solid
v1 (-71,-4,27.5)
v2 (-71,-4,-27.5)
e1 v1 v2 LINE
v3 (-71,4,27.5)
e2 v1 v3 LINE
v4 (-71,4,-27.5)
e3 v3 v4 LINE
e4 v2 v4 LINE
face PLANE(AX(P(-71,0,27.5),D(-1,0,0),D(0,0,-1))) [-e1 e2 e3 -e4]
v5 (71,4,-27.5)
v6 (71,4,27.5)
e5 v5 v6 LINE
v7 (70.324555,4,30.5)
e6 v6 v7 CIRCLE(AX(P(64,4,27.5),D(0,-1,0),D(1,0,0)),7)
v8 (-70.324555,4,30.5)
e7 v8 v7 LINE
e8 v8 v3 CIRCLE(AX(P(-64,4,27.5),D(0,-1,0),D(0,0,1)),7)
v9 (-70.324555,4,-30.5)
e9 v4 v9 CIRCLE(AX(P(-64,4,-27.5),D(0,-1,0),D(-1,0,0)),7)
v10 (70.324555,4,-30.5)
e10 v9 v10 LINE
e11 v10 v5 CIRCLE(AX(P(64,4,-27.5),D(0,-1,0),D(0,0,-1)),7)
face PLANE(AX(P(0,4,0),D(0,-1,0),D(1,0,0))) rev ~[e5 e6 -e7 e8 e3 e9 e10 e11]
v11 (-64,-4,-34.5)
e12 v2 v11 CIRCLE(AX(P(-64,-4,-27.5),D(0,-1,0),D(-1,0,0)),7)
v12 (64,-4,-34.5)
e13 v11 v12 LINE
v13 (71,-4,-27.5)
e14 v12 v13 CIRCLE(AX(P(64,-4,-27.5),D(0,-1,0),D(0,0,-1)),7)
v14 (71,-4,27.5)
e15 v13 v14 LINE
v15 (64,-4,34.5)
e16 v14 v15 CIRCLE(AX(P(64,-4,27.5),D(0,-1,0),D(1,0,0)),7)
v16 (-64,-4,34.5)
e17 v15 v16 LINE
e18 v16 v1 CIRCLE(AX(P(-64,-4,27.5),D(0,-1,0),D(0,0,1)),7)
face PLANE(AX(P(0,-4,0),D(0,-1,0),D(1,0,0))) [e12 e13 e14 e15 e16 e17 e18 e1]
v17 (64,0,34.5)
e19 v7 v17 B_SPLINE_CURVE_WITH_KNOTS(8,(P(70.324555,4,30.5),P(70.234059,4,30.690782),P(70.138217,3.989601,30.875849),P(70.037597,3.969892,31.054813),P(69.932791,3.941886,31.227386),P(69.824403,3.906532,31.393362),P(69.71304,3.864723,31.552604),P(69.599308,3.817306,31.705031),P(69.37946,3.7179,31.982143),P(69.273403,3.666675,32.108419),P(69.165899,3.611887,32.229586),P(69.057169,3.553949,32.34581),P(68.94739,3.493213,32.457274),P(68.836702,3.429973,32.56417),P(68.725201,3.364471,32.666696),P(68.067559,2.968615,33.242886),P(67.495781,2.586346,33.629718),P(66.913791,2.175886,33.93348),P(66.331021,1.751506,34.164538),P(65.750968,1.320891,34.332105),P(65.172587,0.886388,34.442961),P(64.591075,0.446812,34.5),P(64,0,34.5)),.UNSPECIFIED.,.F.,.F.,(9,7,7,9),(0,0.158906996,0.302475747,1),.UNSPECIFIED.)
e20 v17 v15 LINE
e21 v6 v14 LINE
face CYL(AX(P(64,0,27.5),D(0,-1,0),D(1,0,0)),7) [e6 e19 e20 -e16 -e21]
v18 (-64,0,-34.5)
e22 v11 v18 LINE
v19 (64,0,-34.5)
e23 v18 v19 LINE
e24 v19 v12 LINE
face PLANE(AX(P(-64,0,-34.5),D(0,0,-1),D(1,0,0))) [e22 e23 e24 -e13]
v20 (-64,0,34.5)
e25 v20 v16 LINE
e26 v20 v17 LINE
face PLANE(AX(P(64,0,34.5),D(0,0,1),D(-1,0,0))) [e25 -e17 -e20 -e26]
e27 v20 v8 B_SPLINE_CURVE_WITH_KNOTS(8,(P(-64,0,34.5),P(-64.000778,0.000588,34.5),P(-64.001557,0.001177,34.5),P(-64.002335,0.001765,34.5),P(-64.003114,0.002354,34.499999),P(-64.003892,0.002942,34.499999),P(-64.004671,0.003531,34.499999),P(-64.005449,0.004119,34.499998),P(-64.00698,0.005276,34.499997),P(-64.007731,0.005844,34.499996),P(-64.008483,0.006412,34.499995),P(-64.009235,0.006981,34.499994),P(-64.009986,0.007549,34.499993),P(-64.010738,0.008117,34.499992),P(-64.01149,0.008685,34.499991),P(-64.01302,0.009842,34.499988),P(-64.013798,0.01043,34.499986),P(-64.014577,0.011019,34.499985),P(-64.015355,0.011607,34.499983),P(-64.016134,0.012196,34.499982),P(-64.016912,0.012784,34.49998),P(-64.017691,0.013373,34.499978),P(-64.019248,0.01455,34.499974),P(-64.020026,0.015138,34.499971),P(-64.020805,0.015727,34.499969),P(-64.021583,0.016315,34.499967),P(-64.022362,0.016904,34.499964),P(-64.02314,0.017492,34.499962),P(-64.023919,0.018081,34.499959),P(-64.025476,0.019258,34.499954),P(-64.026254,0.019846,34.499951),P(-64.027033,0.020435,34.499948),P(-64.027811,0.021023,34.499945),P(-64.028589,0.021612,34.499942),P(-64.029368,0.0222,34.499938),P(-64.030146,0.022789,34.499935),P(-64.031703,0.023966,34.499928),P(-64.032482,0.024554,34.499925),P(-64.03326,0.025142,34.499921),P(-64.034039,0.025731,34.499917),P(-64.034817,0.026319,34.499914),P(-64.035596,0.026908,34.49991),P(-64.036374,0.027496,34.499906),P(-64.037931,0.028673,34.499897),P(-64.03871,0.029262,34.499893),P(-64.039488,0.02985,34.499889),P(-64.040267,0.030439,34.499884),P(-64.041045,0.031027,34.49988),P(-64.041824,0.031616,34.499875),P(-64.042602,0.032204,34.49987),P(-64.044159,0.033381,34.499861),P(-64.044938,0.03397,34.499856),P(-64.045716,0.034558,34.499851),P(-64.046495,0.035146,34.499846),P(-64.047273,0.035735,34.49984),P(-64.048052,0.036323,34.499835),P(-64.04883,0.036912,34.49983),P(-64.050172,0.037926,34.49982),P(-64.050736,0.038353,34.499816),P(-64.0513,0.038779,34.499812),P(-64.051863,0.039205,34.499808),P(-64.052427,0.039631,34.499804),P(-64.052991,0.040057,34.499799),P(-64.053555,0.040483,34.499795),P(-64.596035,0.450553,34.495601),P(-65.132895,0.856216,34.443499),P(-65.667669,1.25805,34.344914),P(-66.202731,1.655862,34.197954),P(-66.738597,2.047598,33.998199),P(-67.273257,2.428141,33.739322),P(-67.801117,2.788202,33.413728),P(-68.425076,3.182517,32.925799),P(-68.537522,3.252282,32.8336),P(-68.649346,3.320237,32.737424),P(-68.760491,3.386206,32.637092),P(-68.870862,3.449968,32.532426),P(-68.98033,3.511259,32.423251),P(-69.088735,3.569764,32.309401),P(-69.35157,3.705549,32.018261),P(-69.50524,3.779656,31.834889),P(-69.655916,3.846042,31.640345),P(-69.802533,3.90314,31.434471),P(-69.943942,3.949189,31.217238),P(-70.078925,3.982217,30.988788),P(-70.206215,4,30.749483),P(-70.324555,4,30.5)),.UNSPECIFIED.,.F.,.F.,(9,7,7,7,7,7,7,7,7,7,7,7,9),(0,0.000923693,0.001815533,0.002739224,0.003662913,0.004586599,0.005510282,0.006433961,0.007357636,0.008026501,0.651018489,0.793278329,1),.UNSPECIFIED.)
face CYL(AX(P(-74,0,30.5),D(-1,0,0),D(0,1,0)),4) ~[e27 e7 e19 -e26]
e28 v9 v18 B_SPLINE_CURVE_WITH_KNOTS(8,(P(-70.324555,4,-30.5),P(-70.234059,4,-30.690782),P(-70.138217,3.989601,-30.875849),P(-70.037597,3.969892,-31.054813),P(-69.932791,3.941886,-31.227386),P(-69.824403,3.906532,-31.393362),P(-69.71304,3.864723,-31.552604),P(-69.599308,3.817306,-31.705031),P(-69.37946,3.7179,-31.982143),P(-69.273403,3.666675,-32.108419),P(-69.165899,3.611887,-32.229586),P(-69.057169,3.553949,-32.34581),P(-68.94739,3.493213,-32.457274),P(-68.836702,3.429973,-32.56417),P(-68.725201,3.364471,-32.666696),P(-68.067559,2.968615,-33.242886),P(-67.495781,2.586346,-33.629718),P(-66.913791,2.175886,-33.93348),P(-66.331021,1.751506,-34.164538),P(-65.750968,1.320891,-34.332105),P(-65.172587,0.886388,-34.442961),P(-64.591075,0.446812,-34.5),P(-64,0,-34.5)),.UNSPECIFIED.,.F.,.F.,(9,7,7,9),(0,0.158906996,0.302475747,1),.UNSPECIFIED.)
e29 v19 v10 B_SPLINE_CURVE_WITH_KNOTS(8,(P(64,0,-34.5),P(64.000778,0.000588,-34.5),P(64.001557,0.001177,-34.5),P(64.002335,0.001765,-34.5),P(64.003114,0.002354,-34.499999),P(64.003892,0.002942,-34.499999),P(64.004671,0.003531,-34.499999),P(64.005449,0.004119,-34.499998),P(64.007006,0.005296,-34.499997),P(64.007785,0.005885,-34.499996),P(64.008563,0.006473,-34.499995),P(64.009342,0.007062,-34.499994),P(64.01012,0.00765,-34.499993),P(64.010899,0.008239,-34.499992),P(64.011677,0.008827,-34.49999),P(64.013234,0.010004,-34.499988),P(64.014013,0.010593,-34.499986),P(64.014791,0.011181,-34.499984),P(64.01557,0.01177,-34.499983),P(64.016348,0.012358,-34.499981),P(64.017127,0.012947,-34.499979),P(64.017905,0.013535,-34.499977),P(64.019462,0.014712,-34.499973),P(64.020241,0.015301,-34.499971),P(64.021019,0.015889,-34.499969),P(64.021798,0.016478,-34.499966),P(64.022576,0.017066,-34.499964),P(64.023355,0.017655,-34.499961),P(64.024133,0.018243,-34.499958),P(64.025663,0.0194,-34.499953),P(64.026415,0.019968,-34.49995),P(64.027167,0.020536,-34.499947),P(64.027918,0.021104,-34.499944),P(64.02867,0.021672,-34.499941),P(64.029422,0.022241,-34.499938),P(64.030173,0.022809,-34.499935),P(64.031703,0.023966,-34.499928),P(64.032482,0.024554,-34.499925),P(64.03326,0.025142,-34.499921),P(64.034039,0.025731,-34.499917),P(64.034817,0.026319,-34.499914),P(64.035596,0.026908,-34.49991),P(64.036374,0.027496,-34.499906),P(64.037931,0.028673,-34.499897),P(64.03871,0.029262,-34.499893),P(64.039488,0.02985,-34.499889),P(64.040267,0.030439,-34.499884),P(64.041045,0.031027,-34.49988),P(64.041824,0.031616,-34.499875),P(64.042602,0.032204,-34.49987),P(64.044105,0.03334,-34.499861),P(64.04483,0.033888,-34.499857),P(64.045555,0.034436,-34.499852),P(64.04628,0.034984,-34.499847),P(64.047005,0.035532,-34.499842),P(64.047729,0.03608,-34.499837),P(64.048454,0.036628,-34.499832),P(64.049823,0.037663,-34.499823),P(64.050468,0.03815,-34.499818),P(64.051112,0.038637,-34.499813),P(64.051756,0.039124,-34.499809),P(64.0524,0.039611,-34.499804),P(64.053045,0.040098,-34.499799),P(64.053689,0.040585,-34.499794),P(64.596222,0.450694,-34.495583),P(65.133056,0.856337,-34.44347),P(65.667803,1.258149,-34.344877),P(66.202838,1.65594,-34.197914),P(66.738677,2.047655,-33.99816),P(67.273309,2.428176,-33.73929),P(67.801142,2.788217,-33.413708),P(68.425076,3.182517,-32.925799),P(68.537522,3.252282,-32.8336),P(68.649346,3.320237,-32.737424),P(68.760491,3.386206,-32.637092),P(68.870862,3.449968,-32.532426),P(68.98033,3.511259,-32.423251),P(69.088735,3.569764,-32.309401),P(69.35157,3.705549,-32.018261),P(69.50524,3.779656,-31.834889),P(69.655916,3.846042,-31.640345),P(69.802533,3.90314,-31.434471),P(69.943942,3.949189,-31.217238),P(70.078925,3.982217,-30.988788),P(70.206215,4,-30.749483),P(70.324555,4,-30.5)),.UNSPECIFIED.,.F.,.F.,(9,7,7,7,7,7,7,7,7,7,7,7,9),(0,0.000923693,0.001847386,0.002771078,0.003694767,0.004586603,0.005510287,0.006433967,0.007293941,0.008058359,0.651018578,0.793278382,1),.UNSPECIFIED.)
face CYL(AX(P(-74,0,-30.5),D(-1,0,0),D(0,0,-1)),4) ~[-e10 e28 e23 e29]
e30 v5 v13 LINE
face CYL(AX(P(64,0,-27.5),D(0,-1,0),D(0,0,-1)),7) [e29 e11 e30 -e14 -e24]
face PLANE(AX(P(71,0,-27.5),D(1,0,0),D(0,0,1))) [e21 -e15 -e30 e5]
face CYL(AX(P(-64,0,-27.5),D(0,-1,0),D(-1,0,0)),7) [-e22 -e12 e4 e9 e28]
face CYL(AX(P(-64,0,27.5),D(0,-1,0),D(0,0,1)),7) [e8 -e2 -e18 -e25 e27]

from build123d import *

# Parameters (mm, degrees)
F1_DEPTH      = 4
F1_DEPTH_BACK = 4
F2_T1_DEPTH   = 148


# Not quite as in the source:
# - a fillet or chamfer that OpenCascade refuses, or shapes differently, is made with other operations: its cross-section is extruded or revolved along the edge and cut away or added


with BuildPart() as f1:
    # F0 (on Front) → F1 (new body, two sides)
    with BuildSketch(Plane.XZ) as f1_sk:
        with BuildLine():
            Line((-64, -34.5), (64, -34.5))
            ThreePointArc((64, -34.5), (68.9497474683, -32.4497474683), (71, -27.5))
            Line((71, -27.5), (71, 27.5))
            ThreePointArc((71, 27.5), (68.9497474683, 32.4497474683), (64, 34.5))
            Line((64, 34.5), (-64, 34.5))
            ThreePointArc((-64, 34.5), (-68.9497474683, 32.4497474683), (-71, 27.5))
            Line((-71, 27.5), (-71, -27.5))
            ThreePointArc((-71, -27.5), (-68.9497474683, -32.4497474683), (-64, -34.5))
        make_face()
    extrude(amount=F1_DEPTH)
    extrude(f1_sk.sketch, amount=-F1_DEPTH_BACK)

    # F2: fillet of radius 4 on 2 edges, made by hand

    # F2_s2 → F2_t1 (cut)
    with BuildSketch(Plane.YZ.offset(-74)):
        with BuildLine():
            ThreePointArc((4, 30.5), (2.8284271247, 33.3284271247), (0, 34.5))
            Line((0, 34.5), (4, 34.5))
            Line((4, 34.5), (4, 30.5))
        make_face()
        with BuildLine():
            ThreePointArc((0, -34.5), (2.8284271247, -33.3284271247), (4, -30.5))
            Line((4, -30.5), (4, -34.5))
            Line((4, -34.5), (0, -34.5))
        make_face()
    extrude(amount=F2_T1_DEPTH, mode=Mode.SUBTRACT)


solid = f1.part
